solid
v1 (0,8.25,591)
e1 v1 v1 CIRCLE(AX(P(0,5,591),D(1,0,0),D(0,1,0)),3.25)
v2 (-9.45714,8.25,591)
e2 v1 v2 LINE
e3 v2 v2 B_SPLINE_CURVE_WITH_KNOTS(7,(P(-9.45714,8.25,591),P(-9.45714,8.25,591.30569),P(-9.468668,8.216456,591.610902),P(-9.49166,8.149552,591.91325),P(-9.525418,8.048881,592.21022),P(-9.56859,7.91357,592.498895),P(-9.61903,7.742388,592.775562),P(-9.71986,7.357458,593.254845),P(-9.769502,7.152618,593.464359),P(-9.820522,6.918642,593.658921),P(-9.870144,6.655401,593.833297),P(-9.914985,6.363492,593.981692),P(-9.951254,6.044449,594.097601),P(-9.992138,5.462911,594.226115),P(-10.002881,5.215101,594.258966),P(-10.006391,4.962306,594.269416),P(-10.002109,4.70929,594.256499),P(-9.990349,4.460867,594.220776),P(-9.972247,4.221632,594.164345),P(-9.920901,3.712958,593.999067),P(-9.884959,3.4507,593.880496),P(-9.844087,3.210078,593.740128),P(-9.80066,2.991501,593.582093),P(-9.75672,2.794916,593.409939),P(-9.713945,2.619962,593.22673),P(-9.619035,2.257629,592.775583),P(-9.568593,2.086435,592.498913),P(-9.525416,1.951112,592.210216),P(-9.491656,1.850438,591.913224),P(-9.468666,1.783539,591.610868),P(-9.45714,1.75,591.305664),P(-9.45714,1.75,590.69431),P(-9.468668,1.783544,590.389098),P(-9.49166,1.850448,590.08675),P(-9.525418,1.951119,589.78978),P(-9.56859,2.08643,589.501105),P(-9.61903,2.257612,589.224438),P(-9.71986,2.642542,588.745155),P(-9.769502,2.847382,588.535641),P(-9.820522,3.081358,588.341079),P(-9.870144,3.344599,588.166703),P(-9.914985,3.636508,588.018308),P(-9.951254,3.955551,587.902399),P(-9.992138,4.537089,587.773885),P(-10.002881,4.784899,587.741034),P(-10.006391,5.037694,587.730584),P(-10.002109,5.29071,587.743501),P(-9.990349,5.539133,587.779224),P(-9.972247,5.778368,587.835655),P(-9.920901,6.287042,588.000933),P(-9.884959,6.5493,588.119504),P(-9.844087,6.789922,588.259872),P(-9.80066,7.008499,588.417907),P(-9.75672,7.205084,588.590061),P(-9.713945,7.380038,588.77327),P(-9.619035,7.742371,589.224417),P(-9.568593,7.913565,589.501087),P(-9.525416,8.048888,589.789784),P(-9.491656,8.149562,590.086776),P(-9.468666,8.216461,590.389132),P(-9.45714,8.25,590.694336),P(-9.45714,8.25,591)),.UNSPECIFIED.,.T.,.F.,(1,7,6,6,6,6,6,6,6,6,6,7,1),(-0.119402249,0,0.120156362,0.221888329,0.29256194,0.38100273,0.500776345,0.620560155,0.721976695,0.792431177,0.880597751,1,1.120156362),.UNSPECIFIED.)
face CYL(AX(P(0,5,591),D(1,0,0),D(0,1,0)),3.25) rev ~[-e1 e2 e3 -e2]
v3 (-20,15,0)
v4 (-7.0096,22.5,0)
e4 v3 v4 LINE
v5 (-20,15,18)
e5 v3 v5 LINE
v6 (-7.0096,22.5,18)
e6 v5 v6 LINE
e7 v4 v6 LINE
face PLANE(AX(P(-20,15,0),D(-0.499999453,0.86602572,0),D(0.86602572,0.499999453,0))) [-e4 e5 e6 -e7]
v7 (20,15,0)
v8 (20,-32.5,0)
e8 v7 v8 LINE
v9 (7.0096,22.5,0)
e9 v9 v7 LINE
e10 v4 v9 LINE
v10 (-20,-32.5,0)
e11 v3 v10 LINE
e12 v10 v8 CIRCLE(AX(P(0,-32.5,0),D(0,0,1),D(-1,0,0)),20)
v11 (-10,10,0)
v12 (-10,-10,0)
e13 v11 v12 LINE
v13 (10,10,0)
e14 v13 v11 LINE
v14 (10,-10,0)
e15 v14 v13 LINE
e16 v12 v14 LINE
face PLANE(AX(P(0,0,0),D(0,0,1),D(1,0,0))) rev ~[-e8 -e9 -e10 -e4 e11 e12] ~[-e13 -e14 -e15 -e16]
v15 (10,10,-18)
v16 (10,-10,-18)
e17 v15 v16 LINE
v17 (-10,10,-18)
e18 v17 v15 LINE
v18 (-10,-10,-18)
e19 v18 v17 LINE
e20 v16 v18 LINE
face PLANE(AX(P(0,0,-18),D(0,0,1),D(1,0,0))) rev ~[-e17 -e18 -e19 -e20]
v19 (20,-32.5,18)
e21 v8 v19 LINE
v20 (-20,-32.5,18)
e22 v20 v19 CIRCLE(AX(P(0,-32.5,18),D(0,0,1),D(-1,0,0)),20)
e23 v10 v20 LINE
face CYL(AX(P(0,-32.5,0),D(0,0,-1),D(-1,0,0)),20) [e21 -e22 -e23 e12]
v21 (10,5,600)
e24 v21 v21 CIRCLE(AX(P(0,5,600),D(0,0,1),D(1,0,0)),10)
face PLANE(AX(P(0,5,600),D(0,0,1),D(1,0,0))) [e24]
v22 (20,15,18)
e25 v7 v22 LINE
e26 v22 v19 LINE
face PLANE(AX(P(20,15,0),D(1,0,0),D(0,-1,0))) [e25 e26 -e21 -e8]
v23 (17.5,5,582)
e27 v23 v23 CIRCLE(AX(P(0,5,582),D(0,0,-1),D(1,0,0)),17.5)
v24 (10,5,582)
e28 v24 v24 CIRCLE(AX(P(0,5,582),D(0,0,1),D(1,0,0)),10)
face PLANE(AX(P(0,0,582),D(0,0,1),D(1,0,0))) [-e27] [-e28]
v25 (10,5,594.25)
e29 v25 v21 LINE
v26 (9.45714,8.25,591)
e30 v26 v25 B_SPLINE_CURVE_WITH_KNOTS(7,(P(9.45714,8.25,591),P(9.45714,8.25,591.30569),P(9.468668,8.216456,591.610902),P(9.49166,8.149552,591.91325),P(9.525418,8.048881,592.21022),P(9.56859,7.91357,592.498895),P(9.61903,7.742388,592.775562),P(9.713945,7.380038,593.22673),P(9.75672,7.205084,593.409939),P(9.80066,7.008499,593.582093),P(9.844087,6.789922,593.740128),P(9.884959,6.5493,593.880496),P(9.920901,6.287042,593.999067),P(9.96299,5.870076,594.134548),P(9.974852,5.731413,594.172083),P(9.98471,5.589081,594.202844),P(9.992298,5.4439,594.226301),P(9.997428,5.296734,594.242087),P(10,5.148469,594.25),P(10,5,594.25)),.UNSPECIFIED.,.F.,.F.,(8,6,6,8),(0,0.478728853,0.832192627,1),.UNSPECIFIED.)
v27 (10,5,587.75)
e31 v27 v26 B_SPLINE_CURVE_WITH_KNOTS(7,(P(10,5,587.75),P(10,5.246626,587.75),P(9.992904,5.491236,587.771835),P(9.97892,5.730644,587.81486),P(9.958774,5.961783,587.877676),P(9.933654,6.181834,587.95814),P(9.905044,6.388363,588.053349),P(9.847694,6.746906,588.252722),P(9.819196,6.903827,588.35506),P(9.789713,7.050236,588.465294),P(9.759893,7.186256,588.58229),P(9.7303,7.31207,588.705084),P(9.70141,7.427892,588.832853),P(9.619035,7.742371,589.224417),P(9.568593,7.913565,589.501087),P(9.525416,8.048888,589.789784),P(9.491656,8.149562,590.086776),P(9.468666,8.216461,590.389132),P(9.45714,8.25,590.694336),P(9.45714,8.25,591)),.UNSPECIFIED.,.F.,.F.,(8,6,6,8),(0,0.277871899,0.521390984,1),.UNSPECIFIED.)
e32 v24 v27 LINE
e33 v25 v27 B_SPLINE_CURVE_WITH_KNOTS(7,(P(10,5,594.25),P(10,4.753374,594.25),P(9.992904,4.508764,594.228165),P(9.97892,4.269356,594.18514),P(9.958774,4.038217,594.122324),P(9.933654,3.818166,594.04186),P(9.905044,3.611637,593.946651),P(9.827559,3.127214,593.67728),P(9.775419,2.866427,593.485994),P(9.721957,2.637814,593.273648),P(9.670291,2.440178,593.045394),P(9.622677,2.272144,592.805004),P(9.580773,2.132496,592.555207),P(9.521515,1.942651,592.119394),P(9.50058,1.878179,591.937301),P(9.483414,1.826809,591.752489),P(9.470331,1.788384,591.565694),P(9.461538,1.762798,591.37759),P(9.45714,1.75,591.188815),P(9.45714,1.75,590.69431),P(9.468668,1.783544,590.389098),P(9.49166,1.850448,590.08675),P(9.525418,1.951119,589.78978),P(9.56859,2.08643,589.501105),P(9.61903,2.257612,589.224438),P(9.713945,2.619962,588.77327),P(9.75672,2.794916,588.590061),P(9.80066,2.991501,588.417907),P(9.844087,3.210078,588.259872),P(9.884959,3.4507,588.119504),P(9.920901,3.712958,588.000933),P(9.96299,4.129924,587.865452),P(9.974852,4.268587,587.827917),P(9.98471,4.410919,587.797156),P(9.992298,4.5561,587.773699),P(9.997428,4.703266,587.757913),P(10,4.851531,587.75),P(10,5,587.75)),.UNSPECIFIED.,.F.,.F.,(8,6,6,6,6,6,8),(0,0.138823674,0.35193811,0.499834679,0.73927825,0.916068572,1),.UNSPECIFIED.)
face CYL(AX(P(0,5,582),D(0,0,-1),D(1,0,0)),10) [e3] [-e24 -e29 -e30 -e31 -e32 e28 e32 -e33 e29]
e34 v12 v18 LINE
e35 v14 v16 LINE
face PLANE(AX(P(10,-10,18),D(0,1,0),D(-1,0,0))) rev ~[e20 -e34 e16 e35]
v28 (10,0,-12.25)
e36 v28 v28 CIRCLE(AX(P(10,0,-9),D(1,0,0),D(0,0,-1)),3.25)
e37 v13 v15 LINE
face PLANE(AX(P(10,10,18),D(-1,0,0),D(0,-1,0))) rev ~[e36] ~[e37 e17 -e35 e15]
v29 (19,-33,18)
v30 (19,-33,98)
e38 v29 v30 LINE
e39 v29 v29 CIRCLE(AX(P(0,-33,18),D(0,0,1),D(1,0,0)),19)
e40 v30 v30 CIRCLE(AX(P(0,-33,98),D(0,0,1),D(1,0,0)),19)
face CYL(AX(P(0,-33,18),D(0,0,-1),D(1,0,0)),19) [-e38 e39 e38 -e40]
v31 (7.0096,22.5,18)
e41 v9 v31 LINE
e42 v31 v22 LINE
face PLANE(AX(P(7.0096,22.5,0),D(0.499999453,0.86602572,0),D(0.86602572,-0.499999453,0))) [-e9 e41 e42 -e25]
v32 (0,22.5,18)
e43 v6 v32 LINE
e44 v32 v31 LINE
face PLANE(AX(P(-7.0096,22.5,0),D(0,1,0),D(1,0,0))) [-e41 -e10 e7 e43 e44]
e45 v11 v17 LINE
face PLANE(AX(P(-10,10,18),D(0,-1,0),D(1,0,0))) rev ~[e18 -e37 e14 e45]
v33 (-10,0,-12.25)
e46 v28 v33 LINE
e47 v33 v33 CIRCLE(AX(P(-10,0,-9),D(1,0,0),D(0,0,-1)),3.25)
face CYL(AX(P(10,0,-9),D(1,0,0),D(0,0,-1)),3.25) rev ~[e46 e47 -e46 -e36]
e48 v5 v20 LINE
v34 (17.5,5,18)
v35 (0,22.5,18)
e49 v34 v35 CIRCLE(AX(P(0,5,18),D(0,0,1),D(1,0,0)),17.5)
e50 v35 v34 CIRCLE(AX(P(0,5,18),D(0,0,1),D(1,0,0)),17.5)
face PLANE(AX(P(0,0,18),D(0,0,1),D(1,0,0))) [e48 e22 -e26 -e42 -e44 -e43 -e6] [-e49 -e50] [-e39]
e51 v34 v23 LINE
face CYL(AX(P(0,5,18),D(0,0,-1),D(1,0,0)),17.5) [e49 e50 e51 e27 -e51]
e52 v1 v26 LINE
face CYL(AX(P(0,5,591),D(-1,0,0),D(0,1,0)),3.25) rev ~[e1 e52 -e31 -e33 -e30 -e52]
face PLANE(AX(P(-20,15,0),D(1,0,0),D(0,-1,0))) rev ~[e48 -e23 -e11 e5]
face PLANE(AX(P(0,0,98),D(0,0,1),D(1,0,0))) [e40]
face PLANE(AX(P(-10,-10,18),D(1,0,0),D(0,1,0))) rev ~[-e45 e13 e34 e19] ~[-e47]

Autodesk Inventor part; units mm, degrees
ref_plane "YZ Plane" through (0, 0, 0) normal (1, 0, 0) x (0, 1, 0)
ref_plane "XZ Plane" through (0, 0, 0) normal (0, 1, 0) x (-1, 0, 0)
ref_plane "XY Plane" through (0, 0, 0) normal (0, 0, 1) x (1, 0, 0)
sketch "Sketch1" plane through (0, 0, 0) normal (0, 0, 1) x (1, 0, 0)
  line L0 (-10, -10) -> (10, -10)
  line L1 (10, -10) -> (10, 10)
  line L2 (10, 10) -> (-10, 10)
  line L3 (-10, 10) -> (-10, -10)
  line L4 (-10, -10) -> (10, 10) construction
  line L5 (10, -10) -> (-10, 10) construction
  line L6 (-20, 15) -> (-20, -32.5)
  line L7 (-20, 15) -> (-7.0096, 22.5)
  line L8 (-20, 15) -> (-5, 15) construction
  line L9 (-7.0096, 22.5) -> (7.0096, 22.5)
  line L10 (7.0096, 22.5) -> (20, 15)
  line L11 (20, 15) -> (20, -32.5)
  circle A0 centre (0, -32.5) radius 20 construction
  arc A1 (-20, -32.5) -> (20, -32.5) centre (0, -32.5) ccw
  point P0 (0, 0)
  point P1 (0, 22.5)
  point P2 (0, 10)
  dimension "d0" = 20
  dimension "d1" = 20
  dimension "d3" = 15
  dimension "d4" = 30
  dimension "d5" = 15
  dimension "d6" = 150
  dimension "d8" = 40
  dimension "d9" = 5
  dimension "d10" = 40
  dimension "d11" = 55
extrude "Extrusion1" add sketch "Sketch1" along normal blind 18
sketch "Sketch2" plane through (0, 0, 18) normal (0, 0, 1) x (1, 0, 0)
  line L0 (-10, -10) -> (-10, 10) projected
  line L1 (-10, 10) -> (10, 10) projected
  line L2 (10, 10) -> (10, -10) projected
  line L3 (10, -10) -> (-10, -10) projected
  line L4 (-20, 15) -> (-20, -32.5) projected
  arc A0 (-20, -32.5) -> (20, -32.5) centre (0, -32.5) ccw projected
  line L5 (20, -32.5) -> (20, 15) projected
  line L6 (20, 15) -> (7.0096, 22.5) projected
  line L7 (7.0096, 22.5) -> (-7.0096, 22.5) projected
  line L8 (-7.0096, 22.5) -> (-20, 15) projected
  point P0 (0, 0)
extrude "Extrusion2" add sketch "Sketch2" against normal blind 36 contours L0 L1 L2 L3
sketch "Sketch3" plane through (10, -10, 0) normal (1, 0, 0) x (0, 0, -1)
  circle A0 centre (9, 10) radius 3.25
  line L0 (0, 20) -> (18, 20) projected
  line L1 (0, 0) -> (0, 20) projected
  point P0 (0, 10)
  point P1 (9, 20)
  point P2 (0, 10)
  dimension "d16" = 6.5
extrude "Extrusion3" cut sketch "Sketch3" against normal through all
sketch "Sketch4" plane through (0, 0, 18) normal (0, 0, 1) x (1, 0, 0)
  circle A0 centre (0, 5) radius 17.5
  line L0 (7.0096, 22.5) -> (-7.0096, 22.5) projected
  point P0 (0, 0)
  point P1 (0, 22.5)
  dimension "d19" = 35
extrude "Extrusion4" add sketch "Sketch4" along normal blind 564
sketch "Sketch5" plane through (0, 0, 18) normal (0, 0, 1) x (1, 0, 0)
  circle A0 centre (0, -33) radius 19
  circle A1 centre (0, 5) radius 17.5 projected
  point P0 (0, 0)
  dimension "d22" = 38
  dimension "d23" = 38
extrude "Extrusion5" add sketch "Sketch5" along normal blind 80 contours A0
sketch "Sketch6" plane through (0, 5, 582) normal (0, 0, 1) x (1, 0, 0)
  circle A0 centre (0, 0) radius 17.5 projected
  circle A1 centre (0, 0) radius 10
  point P0 (0, -5)
  dimension "d26" = 20
extrude "Extrusion6" add sketch "Sketch6" along normal blind 18 contours A1
sketch "Sketch8" plane through (0, 0, 0) normal (1, 0, 0) x (0, 1, 0)
  line L0 (15, 600) -> (-5, 600) projected
  line L1 (-5, 582) -> (15, 582) projected
  circle A0 centre (5, 591) radius 3.25
  line L2 (15, 600) -> (15, 582)
  line L3 (15, 582) -> (15, 600) projected
  point P0 (0, 0)
  point P1 (15, 591)
  point P2 (5, 582)
  dimension "d29" = 6.5
extrude "Extrusion7" cut sketch "Sketch8" along normal through all both and the other way through all
properties part number "LinearActuator450" material "Steel, Carbon"
